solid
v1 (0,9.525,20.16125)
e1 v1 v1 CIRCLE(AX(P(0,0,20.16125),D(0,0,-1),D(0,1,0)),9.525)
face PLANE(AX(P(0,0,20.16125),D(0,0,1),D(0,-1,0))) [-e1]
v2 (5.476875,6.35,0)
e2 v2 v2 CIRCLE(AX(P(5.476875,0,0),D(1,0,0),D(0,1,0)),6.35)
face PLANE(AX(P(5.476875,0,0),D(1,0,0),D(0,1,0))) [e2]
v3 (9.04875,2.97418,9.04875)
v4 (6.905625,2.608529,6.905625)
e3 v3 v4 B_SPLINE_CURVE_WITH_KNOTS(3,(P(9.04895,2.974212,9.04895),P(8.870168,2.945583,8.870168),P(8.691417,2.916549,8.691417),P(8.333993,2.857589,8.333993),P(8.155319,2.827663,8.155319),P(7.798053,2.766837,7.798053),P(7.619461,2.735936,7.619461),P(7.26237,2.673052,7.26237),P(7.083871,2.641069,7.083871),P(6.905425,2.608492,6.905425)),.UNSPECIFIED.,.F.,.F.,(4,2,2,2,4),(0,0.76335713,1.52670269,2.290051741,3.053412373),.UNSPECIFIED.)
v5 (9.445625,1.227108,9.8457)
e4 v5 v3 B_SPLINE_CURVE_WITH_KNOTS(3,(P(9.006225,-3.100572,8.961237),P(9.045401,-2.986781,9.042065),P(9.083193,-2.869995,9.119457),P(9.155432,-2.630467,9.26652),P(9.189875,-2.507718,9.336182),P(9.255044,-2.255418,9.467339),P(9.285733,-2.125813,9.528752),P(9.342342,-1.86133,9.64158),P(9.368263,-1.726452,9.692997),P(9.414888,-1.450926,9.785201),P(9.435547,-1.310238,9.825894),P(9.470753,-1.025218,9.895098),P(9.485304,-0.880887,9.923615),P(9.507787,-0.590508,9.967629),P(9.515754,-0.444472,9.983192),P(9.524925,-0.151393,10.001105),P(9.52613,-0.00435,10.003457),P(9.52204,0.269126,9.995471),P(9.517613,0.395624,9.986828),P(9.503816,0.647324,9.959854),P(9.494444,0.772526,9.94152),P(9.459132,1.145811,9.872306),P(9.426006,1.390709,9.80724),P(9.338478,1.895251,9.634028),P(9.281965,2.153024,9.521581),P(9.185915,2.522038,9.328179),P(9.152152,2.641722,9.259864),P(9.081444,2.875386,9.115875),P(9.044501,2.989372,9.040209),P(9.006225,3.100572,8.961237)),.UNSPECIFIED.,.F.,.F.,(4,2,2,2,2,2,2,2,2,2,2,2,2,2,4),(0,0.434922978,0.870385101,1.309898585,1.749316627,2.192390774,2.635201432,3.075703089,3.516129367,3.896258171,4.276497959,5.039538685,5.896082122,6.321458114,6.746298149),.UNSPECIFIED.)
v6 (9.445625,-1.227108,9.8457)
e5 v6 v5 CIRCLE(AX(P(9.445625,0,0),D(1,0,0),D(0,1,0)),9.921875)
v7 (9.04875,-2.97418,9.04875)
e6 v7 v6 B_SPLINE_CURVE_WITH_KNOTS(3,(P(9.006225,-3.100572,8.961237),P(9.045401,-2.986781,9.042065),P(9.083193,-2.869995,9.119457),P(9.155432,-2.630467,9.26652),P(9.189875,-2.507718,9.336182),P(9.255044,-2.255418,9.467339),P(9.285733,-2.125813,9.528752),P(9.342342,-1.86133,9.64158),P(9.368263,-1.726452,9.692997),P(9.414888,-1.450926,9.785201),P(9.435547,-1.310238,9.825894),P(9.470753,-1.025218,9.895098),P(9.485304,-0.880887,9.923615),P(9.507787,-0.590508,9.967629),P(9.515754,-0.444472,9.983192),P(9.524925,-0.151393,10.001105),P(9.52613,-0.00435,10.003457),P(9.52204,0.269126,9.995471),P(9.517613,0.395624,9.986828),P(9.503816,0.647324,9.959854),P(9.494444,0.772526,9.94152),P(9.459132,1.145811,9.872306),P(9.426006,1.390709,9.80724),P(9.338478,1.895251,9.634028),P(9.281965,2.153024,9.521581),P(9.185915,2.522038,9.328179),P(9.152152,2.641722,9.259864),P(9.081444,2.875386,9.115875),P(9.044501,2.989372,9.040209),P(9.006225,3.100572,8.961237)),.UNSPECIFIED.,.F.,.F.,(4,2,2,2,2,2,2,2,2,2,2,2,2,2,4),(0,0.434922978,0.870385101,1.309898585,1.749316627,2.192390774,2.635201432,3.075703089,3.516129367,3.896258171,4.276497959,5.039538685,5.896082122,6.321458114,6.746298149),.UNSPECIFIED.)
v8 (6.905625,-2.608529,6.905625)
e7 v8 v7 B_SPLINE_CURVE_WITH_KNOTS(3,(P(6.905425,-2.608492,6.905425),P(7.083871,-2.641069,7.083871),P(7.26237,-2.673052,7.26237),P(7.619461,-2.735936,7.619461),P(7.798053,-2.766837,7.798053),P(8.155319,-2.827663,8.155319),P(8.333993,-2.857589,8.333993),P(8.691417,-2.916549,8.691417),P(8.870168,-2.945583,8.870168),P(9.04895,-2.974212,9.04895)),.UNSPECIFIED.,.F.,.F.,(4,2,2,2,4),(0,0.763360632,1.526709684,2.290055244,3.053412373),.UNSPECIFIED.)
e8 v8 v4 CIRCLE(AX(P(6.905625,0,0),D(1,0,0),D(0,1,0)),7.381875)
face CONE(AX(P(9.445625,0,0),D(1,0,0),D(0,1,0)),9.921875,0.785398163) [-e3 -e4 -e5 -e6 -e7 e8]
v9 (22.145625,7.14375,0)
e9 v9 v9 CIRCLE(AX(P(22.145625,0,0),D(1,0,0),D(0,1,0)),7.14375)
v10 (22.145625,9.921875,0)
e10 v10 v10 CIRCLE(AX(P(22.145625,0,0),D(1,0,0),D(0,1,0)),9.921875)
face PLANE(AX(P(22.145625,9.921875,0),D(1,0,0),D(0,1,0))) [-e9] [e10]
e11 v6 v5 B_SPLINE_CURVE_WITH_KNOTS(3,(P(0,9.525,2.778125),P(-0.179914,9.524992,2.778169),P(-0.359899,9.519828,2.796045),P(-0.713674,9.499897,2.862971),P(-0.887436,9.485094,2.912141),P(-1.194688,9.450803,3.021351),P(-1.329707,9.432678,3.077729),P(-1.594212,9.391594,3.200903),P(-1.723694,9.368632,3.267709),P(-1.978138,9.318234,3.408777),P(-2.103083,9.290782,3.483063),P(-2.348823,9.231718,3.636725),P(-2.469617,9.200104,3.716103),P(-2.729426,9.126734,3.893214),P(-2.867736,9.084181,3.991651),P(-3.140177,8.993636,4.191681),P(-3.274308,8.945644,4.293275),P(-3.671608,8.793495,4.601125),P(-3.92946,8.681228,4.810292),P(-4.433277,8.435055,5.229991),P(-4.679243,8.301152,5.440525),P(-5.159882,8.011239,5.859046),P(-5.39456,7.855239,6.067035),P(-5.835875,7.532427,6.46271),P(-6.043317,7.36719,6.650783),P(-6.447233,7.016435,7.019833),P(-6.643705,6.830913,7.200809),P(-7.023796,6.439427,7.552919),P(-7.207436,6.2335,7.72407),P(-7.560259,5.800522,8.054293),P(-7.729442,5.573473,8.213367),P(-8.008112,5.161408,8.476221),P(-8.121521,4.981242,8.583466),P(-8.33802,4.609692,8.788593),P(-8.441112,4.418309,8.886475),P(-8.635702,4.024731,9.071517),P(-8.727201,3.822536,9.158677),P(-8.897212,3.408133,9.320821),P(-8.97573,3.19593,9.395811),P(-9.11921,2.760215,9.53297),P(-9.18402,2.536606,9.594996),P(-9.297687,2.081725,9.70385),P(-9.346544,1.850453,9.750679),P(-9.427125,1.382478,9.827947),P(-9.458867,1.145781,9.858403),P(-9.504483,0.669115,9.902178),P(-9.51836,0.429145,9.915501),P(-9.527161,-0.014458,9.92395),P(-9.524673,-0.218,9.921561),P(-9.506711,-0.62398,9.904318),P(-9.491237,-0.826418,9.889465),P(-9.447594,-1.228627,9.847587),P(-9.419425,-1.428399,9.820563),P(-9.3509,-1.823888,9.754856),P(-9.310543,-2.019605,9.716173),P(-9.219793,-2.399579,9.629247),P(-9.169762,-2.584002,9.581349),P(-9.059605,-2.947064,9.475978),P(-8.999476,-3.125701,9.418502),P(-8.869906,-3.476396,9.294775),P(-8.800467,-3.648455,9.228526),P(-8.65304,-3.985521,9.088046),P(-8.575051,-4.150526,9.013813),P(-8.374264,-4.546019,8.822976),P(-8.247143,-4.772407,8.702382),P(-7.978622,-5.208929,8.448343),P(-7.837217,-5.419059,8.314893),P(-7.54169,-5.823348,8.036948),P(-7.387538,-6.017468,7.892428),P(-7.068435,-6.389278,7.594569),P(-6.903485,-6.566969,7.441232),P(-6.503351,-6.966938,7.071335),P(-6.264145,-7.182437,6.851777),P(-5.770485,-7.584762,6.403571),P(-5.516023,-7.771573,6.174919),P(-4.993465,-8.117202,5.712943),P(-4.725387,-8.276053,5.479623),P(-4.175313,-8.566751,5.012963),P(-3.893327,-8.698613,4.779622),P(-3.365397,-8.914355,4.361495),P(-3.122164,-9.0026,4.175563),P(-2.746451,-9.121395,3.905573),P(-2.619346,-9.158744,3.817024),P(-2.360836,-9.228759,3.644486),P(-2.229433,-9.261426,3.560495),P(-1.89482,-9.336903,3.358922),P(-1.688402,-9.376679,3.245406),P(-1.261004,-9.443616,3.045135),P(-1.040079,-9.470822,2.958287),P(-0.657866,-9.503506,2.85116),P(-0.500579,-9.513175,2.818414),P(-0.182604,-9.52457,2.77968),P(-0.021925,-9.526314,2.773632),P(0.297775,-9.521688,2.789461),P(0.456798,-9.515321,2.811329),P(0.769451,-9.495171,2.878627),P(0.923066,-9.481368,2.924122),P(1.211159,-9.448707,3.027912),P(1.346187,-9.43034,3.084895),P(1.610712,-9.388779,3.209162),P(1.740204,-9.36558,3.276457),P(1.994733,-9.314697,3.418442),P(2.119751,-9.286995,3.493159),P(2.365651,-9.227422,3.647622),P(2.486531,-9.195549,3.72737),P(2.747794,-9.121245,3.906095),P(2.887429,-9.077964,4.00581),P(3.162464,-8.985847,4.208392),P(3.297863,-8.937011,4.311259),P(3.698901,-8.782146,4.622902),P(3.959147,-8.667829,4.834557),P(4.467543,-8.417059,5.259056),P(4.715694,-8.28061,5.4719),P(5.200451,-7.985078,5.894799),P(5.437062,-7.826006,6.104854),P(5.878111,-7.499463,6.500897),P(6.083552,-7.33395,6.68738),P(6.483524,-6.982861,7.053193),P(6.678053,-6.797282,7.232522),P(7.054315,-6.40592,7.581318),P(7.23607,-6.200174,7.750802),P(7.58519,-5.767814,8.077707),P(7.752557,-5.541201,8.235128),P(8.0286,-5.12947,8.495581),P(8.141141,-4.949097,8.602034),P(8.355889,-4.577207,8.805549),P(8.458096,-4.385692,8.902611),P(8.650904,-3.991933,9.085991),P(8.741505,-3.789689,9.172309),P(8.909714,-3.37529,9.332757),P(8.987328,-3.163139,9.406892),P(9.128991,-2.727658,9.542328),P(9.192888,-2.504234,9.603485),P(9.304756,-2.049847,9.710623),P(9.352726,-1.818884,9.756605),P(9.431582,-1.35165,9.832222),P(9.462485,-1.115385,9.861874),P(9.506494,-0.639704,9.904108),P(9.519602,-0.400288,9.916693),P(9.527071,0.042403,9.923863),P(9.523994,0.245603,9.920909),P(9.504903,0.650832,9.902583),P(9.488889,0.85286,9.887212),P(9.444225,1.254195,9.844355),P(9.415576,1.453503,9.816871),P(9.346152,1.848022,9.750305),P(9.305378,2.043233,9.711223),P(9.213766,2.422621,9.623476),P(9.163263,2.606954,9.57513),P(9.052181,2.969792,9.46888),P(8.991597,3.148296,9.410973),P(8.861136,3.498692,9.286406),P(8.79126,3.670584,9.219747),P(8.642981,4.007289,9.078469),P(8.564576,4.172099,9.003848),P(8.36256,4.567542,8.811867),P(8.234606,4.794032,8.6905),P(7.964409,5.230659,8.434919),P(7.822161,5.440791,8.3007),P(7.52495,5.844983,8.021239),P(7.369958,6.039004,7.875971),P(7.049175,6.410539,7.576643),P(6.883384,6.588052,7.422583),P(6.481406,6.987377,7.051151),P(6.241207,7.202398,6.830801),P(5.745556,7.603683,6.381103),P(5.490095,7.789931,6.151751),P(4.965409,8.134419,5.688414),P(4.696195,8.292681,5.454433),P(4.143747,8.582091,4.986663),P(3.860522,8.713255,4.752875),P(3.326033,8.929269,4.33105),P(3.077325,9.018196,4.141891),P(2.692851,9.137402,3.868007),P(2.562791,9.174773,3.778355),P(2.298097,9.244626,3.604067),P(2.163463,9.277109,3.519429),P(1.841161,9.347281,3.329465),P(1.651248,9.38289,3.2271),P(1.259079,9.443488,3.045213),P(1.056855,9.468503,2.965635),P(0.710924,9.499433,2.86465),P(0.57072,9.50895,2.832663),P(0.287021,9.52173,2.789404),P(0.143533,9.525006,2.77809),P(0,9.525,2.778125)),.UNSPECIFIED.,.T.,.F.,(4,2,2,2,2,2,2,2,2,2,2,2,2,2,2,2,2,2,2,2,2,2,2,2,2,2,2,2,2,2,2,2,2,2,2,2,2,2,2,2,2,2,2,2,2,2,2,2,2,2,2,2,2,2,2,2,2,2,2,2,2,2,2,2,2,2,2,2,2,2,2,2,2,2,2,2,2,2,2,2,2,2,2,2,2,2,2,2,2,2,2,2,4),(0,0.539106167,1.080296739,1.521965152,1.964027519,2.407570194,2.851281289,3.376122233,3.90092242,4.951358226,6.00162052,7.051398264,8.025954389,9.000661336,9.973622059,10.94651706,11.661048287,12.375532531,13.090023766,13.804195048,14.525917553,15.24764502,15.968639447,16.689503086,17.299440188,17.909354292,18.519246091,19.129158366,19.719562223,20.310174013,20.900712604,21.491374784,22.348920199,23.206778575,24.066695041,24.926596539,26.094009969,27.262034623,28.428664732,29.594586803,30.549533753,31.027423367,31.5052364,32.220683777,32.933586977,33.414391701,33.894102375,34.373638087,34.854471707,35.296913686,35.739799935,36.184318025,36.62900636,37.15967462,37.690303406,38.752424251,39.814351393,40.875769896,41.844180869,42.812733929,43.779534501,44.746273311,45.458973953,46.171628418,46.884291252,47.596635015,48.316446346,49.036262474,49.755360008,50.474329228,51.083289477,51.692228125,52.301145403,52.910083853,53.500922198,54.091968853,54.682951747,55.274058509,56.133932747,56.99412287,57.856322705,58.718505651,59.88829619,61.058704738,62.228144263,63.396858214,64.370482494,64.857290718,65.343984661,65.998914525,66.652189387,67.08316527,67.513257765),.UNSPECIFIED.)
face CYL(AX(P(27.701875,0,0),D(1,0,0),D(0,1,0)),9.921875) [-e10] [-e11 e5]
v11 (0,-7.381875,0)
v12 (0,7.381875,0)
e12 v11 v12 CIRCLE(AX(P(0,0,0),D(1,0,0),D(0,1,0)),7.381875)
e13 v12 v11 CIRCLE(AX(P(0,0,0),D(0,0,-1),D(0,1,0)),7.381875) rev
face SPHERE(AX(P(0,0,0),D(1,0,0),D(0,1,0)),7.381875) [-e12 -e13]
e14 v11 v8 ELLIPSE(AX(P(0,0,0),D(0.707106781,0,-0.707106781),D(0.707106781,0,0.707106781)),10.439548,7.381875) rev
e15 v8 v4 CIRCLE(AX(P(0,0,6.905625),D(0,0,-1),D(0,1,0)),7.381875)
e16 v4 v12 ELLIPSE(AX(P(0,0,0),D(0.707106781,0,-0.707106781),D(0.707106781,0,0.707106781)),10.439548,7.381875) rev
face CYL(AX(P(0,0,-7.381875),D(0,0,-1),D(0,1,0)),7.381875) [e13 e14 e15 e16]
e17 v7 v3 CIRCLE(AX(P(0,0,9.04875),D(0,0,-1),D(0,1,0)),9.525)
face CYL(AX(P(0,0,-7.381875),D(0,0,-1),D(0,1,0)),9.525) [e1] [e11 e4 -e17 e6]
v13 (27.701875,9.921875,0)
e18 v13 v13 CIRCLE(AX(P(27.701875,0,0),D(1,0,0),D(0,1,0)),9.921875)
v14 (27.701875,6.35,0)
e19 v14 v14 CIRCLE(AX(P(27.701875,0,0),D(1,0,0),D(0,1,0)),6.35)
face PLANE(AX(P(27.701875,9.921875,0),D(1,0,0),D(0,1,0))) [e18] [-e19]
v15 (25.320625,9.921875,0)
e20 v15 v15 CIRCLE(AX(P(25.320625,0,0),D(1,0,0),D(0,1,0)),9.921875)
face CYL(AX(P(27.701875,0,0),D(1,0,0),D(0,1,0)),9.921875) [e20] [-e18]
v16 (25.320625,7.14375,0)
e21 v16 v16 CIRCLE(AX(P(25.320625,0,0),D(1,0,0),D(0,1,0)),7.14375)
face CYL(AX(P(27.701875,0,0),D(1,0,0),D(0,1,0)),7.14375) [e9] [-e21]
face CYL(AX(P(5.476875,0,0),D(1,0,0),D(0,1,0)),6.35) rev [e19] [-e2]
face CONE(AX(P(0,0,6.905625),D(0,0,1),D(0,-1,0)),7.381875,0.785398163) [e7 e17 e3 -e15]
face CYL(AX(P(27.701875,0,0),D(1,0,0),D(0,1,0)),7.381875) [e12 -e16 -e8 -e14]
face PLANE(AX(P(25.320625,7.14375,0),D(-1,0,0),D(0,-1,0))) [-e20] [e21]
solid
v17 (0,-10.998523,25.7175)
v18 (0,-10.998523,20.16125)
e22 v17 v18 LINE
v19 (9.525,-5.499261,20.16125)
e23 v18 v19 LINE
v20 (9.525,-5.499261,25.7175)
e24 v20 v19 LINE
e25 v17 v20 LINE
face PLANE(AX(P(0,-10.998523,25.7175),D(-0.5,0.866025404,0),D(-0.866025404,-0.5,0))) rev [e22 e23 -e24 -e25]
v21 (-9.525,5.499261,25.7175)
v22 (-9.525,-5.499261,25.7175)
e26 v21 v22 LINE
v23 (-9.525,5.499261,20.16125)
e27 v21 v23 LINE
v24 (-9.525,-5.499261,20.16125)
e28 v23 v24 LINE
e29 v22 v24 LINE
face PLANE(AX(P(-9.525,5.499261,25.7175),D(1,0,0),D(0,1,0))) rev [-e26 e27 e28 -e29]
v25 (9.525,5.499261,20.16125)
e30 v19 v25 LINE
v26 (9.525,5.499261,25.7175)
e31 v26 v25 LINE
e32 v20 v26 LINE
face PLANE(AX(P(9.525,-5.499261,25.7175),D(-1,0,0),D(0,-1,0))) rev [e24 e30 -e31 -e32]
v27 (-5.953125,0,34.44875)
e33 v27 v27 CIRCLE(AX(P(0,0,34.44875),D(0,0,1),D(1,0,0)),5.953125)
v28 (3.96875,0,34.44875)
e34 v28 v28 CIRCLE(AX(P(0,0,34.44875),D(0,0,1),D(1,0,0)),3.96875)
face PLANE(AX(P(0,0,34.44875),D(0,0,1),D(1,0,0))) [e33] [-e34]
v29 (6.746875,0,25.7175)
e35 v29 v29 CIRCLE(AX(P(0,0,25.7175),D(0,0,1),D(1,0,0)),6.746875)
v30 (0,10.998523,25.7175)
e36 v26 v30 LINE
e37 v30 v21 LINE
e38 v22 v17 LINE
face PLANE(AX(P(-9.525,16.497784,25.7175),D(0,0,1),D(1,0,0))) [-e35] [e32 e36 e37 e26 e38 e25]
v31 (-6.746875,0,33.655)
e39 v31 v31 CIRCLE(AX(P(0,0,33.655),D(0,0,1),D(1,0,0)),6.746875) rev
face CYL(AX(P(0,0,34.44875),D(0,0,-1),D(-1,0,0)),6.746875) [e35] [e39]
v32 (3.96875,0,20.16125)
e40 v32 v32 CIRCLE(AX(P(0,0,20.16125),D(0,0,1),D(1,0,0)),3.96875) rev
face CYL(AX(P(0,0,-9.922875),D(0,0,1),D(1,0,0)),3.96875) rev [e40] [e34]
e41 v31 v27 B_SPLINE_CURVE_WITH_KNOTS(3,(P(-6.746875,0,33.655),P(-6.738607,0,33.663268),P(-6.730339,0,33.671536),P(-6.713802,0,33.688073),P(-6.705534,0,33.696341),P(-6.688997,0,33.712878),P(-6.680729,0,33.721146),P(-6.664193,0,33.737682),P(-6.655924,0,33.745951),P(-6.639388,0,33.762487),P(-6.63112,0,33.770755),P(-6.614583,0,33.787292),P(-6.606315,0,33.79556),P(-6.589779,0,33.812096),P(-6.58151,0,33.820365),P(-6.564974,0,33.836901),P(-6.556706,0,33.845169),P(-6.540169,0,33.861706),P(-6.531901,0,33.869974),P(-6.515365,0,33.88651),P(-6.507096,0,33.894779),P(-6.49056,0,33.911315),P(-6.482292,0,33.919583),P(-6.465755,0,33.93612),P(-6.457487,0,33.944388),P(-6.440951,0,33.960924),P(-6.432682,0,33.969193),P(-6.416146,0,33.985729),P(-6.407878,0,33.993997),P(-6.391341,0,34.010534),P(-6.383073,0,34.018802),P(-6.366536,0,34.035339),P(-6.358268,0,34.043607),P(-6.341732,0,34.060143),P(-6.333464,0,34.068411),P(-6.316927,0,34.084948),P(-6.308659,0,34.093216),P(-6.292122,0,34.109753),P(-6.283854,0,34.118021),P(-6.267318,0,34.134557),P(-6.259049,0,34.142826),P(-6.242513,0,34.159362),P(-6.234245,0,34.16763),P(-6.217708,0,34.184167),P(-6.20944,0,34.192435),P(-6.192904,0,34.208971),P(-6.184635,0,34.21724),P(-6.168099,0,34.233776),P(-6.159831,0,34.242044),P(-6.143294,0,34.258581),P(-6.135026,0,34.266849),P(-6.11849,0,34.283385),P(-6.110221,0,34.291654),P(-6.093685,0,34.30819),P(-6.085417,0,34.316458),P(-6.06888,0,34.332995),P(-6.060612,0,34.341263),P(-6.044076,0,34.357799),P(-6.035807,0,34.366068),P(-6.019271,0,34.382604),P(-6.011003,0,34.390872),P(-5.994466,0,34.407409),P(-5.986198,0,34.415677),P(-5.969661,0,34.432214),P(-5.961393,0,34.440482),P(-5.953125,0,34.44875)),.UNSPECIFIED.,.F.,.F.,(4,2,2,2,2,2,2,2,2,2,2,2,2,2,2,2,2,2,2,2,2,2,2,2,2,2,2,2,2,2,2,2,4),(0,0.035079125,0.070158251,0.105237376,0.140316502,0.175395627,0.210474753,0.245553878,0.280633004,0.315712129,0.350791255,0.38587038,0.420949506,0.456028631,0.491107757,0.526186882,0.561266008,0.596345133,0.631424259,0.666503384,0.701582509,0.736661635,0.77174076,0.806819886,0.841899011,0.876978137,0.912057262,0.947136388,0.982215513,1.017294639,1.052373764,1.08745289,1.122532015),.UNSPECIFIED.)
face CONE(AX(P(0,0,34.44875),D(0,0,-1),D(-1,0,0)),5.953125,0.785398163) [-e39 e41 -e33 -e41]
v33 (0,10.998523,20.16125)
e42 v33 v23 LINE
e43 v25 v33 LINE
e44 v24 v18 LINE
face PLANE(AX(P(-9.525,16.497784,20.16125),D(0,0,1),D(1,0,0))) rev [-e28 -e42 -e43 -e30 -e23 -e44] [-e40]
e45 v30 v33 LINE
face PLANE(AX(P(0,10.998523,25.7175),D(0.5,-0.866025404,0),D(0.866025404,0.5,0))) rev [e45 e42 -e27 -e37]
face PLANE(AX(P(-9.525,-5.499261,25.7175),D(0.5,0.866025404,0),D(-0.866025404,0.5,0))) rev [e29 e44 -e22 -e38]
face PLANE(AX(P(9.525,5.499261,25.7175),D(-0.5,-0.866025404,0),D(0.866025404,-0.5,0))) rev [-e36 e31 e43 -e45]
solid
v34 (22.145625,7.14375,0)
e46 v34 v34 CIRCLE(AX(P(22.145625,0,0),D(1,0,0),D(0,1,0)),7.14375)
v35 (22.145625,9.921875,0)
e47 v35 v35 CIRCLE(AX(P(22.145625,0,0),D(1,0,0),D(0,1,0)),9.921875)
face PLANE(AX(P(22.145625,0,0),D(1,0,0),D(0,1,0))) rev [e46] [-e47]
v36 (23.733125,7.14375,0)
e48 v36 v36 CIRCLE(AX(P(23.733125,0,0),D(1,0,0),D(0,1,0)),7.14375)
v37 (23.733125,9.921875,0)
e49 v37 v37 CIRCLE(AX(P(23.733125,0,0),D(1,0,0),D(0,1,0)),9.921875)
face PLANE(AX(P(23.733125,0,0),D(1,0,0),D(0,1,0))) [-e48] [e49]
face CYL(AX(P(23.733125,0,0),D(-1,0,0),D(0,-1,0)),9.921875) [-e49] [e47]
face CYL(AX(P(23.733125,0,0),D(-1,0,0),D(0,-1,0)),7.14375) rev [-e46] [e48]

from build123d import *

# Parameters (mm, degrees)
SKETCH2_R          = 9.921875
SKETCH2_R_2        = 7.14375
EXTRUDE1_DEPTH     = 1.5875
SKETCH7_R          = 6.35
CUT_EXTRUDE1_DEPTH = 22.225
EXTRUDE2_DEPTH     = 5.55625
SKETCH6_R          = 6.746875
EXTRUDE3_DEPTH     = 8.73125
CHAMFER1_SIZE      = 0.79375
SKETCH9_R          = 3.96875
CUT_EXTRUDE2_DEPTH = 14.2875


with BuildPart() as part:
    # Sketch1 → Revolve1 (revolve)
    with BuildSketch(Plane.XY):
        with BuildLine():
            Line((0, 7.381875), (6.905625, 7.381875))
            Line((6.905625, 7.381875), (9.445625, 9.921875))
            Line((9.445625, 9.921875), (22.145625, 9.921875))
            Line((22.145625, 9.921875), (22.145625, 7.14375))
            Line((22.145625, 7.14375), (25.320625, 7.14375))
            Line((25.320625, 7.14375), (25.320625, 9.921875))
            Line((25.320625, 9.921875), (27.701875, 9.921875))
            Line((27.701875, 9.921875), (27.701875, 0))
            Line((27.701875, 0), (-7.381875, 0))
            ThreePointArc((-7.381875, 0), (-5.21977387, 5.21977387), (0, 7.381875))
        make_face()
    revolve(axis=Axis((27.701875, 0, 0), (-1, 0, 0)))


with BuildPart() as revolve3_tool:
    # Sketch4 → Revolve3 (revolve)
    with BuildSketch(Plane(origin=(0, 0, 0), x_dir=(0, 0, -1), z_dir=(1, 0, 0))):
        with BuildLine():
            Line((7.381875, 0), (-20.16125, 0))
            Line((-20.16125, 0), (-20.16125, 9.525))
            Line((-20.16125, 9.525), (-9.04875, 9.525))
            Line((-9.04875, 9.525), (-6.905625, 7.381875))
            Line((-6.905625, 7.381875), (0, 7.381875))
            ThreePointArc((0, 7.381875), (5.21977387, 5.21977387), (7.381875, 0))
        make_face()
    revolve(axis=Axis((0, 0, -7.381875), (0, 0, 1)))


with BuildPart() as part_1:
    add(part.part)


with BuildPart() as part_2:
    # Revolve3: joined with revolve3_tool
    add(part_1.part.fuse(revolve3_tool.part, tol=0.00001))

    # Sketch7 → Cut-Extrude1 (cut)
    with BuildSketch(Plane(origin=(27.701875, 0, 0), x_dir=(0, 0, -1), z_dir=(1, 0, 0))):
        with Locations(Location((0, 0, 0), (0, 0, 90))):
            Circle(SKETCH7_R)
    extrude(amount=-CUT_EXTRUDE1_DEPTH, mode=Mode.SUBTRACT)


with BuildPart() as body_2:
    # Sketch2 → Extrude1 (new body)
    with BuildSketch(Plane(origin=(22.145625, 0, 0), x_dir=(0, 0, -1), z_dir=(1, 0, 0))):
        with Locations(Location((0, 0, 0), (0, 0, 90))):
            Circle(SKETCH2_R)
        with Locations(Location((0, 0, 0), (0, 0, 90))):
            Circle(SKETCH2_R_2, mode=Mode.SUBTRACT)
    extrude(amount=EXTRUDE1_DEPTH)


with BuildPart() as body_3:
    # Sketch5 → Extrude2 (new body)
    with BuildSketch(Plane.XY.offset(20.16125)):
        Polygon((0, 10.998522628), (-9.525, 5.499261314), (-9.525, -5.499261314), (0, -10.998522628), (9.525, -5.499261314), (9.525, 5.499261314), align=None)
    extrude(amount=EXTRUDE2_DEPTH)

    # Sketch6 → Extrude3 (add)
    with BuildSketch(Plane.XY.offset(25.7175)):
        Circle(SKETCH6_R)
    extrude(amount=EXTRUDE3_DEPTH)

    # Chamfer1
    chamfer1_edges = [body_3.edges().sort_by_distance(p)[0] for p in [
        (-6.746875, 0, 34.44875),
    ]]
    chamfer(chamfer1_edges, length=CHAMFER1_SIZE)

    # Sketch9 → Cut-Extrude2 (cut)
    with BuildSketch(Plane.XY.offset(34.44875)):
        Circle(SKETCH9_R)
    extrude(amount=-CUT_EXTRUDE2_DEPTH, mode=Mode.SUBTRACT)


solid = Compound([part_2.part, body_2.part, body_3.part])
